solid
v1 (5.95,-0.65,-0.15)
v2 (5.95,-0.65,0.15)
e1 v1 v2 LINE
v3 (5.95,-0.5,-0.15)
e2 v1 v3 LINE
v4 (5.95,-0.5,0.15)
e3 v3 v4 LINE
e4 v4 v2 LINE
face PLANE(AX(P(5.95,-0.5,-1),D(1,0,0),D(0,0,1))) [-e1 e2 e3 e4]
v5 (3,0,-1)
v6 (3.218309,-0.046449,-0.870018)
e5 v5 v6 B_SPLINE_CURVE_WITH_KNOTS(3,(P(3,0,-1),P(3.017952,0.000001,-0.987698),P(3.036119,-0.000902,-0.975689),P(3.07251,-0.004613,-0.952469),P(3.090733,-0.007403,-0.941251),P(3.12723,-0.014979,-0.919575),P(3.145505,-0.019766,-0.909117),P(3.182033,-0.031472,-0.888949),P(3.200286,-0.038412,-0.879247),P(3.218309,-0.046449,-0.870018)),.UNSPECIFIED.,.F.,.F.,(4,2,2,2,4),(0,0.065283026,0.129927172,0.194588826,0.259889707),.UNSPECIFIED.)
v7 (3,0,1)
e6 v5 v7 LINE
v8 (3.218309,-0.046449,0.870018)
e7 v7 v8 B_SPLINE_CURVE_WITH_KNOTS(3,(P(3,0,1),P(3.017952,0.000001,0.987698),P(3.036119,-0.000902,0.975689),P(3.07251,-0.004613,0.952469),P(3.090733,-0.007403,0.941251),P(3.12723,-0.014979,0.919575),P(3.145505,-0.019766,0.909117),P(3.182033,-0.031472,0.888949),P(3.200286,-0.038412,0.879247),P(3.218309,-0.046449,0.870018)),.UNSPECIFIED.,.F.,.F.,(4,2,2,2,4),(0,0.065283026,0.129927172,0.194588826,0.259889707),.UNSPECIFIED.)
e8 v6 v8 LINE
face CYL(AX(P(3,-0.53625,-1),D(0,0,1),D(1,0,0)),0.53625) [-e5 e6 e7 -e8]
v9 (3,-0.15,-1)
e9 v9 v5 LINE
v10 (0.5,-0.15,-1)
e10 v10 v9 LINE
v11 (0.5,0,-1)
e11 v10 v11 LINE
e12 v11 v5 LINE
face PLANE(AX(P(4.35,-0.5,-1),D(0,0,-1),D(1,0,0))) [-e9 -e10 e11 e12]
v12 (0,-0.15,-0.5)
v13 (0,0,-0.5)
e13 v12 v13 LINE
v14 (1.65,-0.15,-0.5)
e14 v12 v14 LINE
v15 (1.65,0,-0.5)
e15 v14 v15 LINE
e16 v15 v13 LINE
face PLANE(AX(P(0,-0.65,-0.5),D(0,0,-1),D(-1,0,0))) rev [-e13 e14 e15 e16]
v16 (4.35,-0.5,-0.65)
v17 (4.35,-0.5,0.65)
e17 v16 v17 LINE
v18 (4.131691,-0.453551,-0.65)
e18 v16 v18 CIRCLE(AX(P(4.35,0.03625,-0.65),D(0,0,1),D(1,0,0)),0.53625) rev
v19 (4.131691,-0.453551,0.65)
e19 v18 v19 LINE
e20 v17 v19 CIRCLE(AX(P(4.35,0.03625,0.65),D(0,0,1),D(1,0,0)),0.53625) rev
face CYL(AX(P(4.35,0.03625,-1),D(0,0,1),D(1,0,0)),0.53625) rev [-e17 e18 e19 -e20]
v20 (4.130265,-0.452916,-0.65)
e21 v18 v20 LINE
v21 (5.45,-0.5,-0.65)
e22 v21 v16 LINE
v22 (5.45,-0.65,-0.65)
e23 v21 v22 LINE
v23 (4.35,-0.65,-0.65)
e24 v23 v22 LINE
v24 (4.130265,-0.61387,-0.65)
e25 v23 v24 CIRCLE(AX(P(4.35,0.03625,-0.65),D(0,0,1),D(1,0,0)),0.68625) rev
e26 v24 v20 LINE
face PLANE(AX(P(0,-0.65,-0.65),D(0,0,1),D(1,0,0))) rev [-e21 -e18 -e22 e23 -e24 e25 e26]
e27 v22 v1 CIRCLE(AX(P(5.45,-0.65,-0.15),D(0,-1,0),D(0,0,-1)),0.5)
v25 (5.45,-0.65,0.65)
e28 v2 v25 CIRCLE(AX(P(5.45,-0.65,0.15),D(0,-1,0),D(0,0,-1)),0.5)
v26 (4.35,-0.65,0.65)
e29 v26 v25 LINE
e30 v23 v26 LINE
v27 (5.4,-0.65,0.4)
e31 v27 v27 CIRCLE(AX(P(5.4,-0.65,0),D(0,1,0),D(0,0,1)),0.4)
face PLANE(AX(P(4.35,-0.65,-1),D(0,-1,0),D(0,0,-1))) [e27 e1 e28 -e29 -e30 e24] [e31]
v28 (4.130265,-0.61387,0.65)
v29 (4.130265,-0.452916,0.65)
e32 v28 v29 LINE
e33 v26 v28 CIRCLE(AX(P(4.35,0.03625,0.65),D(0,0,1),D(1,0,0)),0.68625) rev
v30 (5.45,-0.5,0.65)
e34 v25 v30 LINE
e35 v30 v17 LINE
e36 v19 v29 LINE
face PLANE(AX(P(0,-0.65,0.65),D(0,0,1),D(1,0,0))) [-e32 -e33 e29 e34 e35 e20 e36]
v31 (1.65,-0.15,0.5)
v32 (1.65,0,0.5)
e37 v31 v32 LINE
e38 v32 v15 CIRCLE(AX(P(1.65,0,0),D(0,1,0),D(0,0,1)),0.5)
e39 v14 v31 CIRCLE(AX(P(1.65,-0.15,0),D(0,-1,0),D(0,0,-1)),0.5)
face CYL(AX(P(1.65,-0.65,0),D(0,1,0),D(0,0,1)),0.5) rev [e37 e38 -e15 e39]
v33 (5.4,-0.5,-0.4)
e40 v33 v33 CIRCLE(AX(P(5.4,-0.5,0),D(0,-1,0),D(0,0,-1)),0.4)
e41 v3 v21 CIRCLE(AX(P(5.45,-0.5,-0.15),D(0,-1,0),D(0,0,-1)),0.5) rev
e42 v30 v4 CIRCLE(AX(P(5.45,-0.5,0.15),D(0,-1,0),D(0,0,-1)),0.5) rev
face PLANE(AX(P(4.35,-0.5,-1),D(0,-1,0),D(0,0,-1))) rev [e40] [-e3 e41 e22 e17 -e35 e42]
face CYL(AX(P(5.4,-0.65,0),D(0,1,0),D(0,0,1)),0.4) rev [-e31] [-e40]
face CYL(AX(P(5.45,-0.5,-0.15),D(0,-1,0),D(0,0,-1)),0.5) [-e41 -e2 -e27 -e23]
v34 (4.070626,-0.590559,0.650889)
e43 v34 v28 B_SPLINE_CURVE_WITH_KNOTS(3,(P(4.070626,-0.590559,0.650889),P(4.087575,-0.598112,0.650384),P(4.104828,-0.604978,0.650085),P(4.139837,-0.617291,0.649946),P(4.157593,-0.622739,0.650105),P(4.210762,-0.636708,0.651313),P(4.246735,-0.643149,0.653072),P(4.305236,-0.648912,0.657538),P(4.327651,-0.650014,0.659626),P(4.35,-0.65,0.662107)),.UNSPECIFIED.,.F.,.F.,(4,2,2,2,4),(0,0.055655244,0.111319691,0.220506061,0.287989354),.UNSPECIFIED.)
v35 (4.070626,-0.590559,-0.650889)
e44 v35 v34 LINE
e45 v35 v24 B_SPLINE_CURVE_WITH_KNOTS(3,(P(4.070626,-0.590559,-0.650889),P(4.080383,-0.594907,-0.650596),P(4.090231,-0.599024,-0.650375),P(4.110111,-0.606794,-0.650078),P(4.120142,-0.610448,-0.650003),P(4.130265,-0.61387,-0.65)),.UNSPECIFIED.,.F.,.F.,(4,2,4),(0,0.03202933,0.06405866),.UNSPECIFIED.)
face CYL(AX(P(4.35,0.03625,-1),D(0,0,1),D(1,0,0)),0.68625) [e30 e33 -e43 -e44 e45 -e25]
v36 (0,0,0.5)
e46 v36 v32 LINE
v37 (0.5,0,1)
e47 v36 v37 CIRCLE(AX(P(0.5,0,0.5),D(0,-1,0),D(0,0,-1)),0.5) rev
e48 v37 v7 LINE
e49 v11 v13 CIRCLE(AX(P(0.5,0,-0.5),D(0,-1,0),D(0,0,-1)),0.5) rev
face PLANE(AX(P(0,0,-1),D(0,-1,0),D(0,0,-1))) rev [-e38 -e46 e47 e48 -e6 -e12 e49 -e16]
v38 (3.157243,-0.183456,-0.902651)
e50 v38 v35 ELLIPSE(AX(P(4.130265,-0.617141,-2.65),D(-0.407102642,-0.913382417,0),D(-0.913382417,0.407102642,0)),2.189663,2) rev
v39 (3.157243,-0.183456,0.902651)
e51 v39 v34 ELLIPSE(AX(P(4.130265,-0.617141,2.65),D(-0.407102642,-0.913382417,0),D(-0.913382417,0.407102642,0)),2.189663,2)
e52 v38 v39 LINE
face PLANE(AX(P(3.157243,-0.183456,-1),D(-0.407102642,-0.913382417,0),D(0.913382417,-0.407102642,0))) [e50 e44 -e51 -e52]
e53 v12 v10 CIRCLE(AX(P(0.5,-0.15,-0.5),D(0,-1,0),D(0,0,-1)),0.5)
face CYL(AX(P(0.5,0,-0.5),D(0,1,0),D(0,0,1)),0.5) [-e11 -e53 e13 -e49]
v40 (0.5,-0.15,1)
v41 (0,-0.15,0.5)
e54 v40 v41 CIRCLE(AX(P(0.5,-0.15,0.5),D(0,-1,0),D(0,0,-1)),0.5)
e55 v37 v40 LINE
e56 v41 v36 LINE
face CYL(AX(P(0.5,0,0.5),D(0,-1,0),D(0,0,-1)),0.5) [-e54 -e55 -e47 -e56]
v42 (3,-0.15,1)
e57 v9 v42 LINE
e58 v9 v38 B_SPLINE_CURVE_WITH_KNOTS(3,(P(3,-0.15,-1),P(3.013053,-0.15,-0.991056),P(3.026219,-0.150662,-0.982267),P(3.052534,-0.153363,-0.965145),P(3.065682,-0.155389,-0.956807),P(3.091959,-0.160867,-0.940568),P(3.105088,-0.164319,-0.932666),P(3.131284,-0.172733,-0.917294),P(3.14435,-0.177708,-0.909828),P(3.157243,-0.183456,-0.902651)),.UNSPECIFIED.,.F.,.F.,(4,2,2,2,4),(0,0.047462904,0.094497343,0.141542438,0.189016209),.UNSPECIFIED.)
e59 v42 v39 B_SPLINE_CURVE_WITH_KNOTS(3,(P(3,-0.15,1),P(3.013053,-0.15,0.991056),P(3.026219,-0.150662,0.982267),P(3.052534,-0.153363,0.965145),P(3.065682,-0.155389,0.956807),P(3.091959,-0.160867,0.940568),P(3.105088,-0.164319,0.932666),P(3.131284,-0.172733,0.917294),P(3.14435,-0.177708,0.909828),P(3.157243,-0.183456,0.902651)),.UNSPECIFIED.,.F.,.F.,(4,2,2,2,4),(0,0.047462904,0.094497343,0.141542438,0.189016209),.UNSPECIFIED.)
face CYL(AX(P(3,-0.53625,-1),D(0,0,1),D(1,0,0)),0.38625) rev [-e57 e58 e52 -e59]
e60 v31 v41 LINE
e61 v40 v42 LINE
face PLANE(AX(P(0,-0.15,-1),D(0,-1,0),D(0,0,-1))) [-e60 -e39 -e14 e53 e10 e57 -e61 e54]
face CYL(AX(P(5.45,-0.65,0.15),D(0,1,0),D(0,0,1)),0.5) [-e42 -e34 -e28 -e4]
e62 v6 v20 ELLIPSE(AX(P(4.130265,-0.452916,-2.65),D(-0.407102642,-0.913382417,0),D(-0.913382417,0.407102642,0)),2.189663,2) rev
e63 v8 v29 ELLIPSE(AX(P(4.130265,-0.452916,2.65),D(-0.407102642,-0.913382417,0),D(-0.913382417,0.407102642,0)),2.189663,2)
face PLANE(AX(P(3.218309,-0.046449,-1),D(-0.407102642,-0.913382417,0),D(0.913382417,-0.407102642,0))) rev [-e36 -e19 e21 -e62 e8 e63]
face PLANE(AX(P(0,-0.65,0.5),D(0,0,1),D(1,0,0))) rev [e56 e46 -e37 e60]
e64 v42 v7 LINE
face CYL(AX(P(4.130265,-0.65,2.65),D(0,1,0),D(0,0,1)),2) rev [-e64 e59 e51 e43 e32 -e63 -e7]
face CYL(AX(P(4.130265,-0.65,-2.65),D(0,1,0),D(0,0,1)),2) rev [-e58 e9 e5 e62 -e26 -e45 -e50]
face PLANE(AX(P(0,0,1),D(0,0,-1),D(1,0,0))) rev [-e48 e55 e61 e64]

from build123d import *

# Parameters (mm, degrees)
SURFACE_EXTRUDE1_1_BACK  = 1
SURFACE_EXTRUDE1_1_DEPTH = 2
THICKEN1_T2              = 0.15
CUT_EXTRUDE2_DEPTH       = 7.054130821
CUT_EXTRUDE2_DEPTH_BACK  = 7.054130821
SKETCH3_R                = 0.4
FILLET1_R                = 0.5


with BuildPart() as body_1:
    # Surface-Extrude1: a surface, the sketch's curves swept straight by 2 mm
    with BuildLine(Plane.XY.offset(-SURFACE_EXTRUDE1_1_BACK), mode=Mode.PRIVATE) as surface_extrude1_1_path:
        Line((0, 0), (3, 0))
        ThreePointArc((3, 0), (3.111597724, -0.011740696), (3.218308792, -0.046448679))
        Line((3.218308792, -0.046448679), (4.131691208, -0.453551321))
        ThreePointArc((4.131691208, -0.453551321), (4.238402276, -0.488259304), (4.35, -0.5))
        Line((4.35, -0.5), (5.95, -0.5))
    surface_extrude1_1 = Shell.extrude(surface_extrude1_1_path.wire(), (0 * SURFACE_EXTRUDE1_1_DEPTH, 0 * SURFACE_EXTRUDE1_1_DEPTH, 1 * SURFACE_EXTRUDE1_1_DEPTH))
    add(Solid.thicken(surface_extrude1_1, -THICKEN1_T2))

    # Sketch3 → Cut-Extrude2 (cut, two sides: drawn at the far end of the back side and taken through both)
    with BuildSketch(Plane(origin=(0, -0.5, 0), x_dir=(1, 0, 0), z_dir=(0, 1, 0)).offset(-CUT_EXTRUDE2_DEPTH_BACK)):
        with Locations(Location((5.4, 0, 0), (0, 0, 270))):
            Circle(SKETCH3_R)
        with BuildLine():
            Line((1.65, 0.5), (0, 0.5))
            Line((0, 0.5), (0, -0.5))
            Line((0, -0.5), (1.65, -0.5))
            ThreePointArc((1.65, -0.5), (2.15, 0), (1.65, 0.5))
        make_face()
        with BuildLine():
            Line((4.130265456, 0.65), (5.95, 0.65))
            Line((5.95, 0.65), (5.95, 1))
            Line((5.95, 1), (3, 1))
            ThreePointArc((3, 1), (3.538657477, 0.739502683), (4.130265456, 0.65))
        make_face()
        with BuildLine():
            Line((4.130265456, -0.65), (5.95, -0.65))
            Line((5.95, -0.65), (5.95, -1))
            Line((5.95, -1), (3, -1))
            ThreePointArc((3, -1), (3.538657477, -0.739502683), (4.130265456, -0.65))
        make_face()
    extrude(amount=CUT_EXTRUDE2_DEPTH + CUT_EXTRUDE2_DEPTH_BACK, mode=Mode.SUBTRACT)

    # Fillet1
    fillet1_edges = [body_1.edges().sort_by_distance(p)[0] for p in [
        (0, -0.075, 1),
        (0, -0.075, -1),
        (5.95, -0.575, -0.65),
        (5.95, -0.575, 0.65),
    ]]
    fillet(fillet1_edges, radius=FILLET1_R - 0.0001)  # a hair under: the kernel refuses the full size


solid = body_1.part
